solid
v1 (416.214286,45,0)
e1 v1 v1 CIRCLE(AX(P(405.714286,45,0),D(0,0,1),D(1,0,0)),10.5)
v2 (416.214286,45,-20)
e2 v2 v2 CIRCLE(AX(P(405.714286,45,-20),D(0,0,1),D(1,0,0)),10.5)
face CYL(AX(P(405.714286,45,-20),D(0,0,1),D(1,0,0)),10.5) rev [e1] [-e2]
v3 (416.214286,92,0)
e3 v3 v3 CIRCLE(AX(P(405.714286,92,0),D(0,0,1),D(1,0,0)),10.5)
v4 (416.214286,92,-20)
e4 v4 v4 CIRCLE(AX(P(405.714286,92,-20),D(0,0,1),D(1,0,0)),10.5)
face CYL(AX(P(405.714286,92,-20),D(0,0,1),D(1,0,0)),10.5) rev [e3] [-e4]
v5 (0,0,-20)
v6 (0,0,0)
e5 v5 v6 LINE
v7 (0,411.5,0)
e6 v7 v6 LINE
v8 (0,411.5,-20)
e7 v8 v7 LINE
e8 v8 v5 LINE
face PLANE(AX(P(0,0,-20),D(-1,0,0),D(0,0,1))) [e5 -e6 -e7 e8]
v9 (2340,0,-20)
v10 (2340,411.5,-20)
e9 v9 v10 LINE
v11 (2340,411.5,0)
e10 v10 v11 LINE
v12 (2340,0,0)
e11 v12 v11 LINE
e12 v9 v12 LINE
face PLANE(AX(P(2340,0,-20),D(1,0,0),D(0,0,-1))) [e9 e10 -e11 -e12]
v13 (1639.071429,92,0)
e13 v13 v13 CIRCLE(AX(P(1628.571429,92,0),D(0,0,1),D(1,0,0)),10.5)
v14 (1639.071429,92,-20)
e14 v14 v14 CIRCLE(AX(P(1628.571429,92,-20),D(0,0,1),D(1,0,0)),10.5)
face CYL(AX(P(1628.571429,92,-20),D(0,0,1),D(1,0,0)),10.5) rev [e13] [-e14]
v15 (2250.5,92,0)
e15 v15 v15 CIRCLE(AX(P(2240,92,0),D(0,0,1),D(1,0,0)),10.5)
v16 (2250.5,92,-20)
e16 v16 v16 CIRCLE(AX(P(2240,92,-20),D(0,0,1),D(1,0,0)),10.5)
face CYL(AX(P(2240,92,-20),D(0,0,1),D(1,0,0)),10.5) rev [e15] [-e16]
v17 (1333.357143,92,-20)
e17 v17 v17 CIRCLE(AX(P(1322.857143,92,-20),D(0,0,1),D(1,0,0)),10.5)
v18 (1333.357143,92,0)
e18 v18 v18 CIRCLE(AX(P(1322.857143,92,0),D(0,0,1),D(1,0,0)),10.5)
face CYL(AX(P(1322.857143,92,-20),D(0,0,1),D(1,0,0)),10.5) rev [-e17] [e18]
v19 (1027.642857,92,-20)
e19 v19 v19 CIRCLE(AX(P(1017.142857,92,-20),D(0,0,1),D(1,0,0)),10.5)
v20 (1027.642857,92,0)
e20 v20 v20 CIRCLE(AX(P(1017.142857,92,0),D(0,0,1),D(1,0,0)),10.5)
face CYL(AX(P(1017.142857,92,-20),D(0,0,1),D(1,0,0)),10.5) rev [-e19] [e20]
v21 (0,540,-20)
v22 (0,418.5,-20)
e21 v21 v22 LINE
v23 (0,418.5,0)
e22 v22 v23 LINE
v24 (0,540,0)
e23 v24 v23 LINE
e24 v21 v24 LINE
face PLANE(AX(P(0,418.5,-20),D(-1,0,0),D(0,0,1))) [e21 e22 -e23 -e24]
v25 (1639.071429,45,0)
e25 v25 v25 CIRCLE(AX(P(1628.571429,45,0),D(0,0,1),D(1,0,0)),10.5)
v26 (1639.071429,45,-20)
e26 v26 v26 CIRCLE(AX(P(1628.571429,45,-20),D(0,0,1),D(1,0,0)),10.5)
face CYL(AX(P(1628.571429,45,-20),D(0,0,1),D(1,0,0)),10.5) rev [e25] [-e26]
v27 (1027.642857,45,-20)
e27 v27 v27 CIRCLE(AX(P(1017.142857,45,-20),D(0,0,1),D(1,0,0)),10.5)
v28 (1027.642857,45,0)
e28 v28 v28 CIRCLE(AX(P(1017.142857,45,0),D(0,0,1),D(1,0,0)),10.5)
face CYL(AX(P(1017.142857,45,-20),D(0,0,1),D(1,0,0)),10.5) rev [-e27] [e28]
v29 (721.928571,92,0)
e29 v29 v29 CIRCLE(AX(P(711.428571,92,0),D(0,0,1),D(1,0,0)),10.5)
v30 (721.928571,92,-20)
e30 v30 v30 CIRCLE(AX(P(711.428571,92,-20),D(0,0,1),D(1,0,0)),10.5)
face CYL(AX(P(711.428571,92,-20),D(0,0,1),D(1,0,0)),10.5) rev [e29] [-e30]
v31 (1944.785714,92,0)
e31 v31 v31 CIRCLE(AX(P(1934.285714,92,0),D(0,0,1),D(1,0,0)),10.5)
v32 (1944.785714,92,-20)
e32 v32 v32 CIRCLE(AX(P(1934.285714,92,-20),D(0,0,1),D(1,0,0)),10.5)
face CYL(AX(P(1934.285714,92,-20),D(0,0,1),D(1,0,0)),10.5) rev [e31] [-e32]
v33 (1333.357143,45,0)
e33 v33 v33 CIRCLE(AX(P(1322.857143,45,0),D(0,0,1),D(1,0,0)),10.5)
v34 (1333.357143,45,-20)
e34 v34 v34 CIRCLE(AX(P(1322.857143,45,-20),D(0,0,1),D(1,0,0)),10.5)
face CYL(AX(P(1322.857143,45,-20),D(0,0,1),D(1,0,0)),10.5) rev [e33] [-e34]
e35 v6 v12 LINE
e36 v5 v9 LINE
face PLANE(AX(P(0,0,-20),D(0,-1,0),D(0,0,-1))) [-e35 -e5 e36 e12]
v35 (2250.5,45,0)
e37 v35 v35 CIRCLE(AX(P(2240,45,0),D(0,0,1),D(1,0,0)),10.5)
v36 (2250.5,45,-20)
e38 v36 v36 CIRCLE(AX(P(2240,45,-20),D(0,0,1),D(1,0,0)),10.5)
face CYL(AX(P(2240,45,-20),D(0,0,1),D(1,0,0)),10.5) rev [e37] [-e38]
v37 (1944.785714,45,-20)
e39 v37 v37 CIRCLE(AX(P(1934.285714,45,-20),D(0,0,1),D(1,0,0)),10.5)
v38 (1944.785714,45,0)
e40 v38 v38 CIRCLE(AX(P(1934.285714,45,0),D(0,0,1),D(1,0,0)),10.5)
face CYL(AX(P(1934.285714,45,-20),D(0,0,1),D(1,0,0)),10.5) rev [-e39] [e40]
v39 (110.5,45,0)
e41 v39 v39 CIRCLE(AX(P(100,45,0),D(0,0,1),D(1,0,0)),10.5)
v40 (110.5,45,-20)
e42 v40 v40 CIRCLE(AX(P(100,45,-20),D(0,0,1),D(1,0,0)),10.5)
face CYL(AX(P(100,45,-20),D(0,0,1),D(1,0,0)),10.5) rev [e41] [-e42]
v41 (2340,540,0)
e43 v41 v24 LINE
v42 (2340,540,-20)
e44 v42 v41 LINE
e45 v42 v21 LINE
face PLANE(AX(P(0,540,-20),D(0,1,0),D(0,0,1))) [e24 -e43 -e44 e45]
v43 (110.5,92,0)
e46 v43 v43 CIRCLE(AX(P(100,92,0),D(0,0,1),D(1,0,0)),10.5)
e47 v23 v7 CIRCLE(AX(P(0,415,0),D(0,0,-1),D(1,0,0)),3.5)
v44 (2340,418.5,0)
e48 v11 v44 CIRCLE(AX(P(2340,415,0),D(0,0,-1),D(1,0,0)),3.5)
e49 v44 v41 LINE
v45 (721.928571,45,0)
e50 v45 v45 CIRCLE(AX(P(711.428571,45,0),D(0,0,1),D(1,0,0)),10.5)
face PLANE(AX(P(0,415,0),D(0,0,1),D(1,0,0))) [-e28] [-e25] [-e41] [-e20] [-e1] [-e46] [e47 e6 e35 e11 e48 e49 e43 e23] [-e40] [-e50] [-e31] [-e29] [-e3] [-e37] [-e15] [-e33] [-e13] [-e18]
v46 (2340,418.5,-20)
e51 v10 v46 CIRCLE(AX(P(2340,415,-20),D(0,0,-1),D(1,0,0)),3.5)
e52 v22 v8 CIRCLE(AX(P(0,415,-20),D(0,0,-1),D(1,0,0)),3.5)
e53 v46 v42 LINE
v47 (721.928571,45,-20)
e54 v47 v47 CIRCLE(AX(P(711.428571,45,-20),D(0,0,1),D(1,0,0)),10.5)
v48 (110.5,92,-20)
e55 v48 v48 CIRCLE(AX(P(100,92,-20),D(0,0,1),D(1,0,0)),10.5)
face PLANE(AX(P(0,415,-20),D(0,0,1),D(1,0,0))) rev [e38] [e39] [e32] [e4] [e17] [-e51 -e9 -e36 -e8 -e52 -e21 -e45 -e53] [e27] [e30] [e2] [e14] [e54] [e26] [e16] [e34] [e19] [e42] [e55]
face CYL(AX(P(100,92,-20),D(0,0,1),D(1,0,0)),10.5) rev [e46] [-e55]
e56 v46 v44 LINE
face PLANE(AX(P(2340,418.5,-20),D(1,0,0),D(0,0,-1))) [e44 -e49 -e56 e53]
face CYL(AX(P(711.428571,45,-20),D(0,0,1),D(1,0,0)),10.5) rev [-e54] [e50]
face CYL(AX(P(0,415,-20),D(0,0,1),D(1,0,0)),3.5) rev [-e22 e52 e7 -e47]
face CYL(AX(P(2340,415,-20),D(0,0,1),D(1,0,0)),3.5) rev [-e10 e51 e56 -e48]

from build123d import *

# Parameters (mm, degrees)
IZIM1_R            = 10.5
TABAN_FLAN_1_DEPTH = 20


# Sheet-metal steps are written as plain solids
with BuildPart() as part:
    # Çizim1 → Taban-Flanş1 (new body)
    with BuildSketch(Plane.XY):
        with BuildLine():
            Line((0, 0), (2340, 0))
            Line((2340, 0), (2340, 411.5))
            ThreePointArc((2340, 411.5), (2336.5, 415), (2340, 418.5))
            Line((2340, 418.5), (2340, 540))
            Line((2340, 540), (0, 540))
            Line((0, 540), (0, 418.5))
            ThreePointArc((0, 418.5), (3.5, 415), (0, 411.5))
            Line((0, 411.5), (0, 0))
        make_face()
        with Locations((100, 92)):
            Circle(IZIM1_R, mode=Mode.SUBTRACT)
        with Locations((100, 45)):
            Circle(IZIM1_R, mode=Mode.SUBTRACT)
        with Locations((405.714285714, 92)):
            Circle(IZIM1_R, mode=Mode.SUBTRACT)
        with Locations((405.714285714, 45)):
            Circle(IZIM1_R, mode=Mode.SUBTRACT)
        with Locations((711.428571429, 92)):
            Circle(IZIM1_R, mode=Mode.SUBTRACT)
        with Locations((711.428571429, 45)):
            Circle(IZIM1_R, mode=Mode.SUBTRACT)
        with Locations((1017.142857143, 92)):
            Circle(IZIM1_R, mode=Mode.SUBTRACT)
        with Locations((1017.142857143, 45)):
            Circle(IZIM1_R, mode=Mode.SUBTRACT)
        with Locations((1322.857142857, 92)):
            Circle(IZIM1_R, mode=Mode.SUBTRACT)
        with Locations((1322.857142857, 45)):
            Circle(IZIM1_R, mode=Mode.SUBTRACT)
        with Locations((1628.571428571, 92)):
            Circle(IZIM1_R, mode=Mode.SUBTRACT)
        with Locations((1628.571428571, 45)):
            Circle(IZIM1_R, mode=Mode.SUBTRACT)
        with Locations((1934.285714286, 92)):
            Circle(IZIM1_R, mode=Mode.SUBTRACT)
        with Locations((1934.285714286, 45)):
            Circle(IZIM1_R, mode=Mode.SUBTRACT)
        with Locations((2240, 92)):
            Circle(IZIM1_R, mode=Mode.SUBTRACT)
        with Locations((2240, 45)):
            Circle(IZIM1_R, mode=Mode.SUBTRACT)
    extrude(amount=-TABAN_FLAN_1_DEPTH)


solid = part.part
